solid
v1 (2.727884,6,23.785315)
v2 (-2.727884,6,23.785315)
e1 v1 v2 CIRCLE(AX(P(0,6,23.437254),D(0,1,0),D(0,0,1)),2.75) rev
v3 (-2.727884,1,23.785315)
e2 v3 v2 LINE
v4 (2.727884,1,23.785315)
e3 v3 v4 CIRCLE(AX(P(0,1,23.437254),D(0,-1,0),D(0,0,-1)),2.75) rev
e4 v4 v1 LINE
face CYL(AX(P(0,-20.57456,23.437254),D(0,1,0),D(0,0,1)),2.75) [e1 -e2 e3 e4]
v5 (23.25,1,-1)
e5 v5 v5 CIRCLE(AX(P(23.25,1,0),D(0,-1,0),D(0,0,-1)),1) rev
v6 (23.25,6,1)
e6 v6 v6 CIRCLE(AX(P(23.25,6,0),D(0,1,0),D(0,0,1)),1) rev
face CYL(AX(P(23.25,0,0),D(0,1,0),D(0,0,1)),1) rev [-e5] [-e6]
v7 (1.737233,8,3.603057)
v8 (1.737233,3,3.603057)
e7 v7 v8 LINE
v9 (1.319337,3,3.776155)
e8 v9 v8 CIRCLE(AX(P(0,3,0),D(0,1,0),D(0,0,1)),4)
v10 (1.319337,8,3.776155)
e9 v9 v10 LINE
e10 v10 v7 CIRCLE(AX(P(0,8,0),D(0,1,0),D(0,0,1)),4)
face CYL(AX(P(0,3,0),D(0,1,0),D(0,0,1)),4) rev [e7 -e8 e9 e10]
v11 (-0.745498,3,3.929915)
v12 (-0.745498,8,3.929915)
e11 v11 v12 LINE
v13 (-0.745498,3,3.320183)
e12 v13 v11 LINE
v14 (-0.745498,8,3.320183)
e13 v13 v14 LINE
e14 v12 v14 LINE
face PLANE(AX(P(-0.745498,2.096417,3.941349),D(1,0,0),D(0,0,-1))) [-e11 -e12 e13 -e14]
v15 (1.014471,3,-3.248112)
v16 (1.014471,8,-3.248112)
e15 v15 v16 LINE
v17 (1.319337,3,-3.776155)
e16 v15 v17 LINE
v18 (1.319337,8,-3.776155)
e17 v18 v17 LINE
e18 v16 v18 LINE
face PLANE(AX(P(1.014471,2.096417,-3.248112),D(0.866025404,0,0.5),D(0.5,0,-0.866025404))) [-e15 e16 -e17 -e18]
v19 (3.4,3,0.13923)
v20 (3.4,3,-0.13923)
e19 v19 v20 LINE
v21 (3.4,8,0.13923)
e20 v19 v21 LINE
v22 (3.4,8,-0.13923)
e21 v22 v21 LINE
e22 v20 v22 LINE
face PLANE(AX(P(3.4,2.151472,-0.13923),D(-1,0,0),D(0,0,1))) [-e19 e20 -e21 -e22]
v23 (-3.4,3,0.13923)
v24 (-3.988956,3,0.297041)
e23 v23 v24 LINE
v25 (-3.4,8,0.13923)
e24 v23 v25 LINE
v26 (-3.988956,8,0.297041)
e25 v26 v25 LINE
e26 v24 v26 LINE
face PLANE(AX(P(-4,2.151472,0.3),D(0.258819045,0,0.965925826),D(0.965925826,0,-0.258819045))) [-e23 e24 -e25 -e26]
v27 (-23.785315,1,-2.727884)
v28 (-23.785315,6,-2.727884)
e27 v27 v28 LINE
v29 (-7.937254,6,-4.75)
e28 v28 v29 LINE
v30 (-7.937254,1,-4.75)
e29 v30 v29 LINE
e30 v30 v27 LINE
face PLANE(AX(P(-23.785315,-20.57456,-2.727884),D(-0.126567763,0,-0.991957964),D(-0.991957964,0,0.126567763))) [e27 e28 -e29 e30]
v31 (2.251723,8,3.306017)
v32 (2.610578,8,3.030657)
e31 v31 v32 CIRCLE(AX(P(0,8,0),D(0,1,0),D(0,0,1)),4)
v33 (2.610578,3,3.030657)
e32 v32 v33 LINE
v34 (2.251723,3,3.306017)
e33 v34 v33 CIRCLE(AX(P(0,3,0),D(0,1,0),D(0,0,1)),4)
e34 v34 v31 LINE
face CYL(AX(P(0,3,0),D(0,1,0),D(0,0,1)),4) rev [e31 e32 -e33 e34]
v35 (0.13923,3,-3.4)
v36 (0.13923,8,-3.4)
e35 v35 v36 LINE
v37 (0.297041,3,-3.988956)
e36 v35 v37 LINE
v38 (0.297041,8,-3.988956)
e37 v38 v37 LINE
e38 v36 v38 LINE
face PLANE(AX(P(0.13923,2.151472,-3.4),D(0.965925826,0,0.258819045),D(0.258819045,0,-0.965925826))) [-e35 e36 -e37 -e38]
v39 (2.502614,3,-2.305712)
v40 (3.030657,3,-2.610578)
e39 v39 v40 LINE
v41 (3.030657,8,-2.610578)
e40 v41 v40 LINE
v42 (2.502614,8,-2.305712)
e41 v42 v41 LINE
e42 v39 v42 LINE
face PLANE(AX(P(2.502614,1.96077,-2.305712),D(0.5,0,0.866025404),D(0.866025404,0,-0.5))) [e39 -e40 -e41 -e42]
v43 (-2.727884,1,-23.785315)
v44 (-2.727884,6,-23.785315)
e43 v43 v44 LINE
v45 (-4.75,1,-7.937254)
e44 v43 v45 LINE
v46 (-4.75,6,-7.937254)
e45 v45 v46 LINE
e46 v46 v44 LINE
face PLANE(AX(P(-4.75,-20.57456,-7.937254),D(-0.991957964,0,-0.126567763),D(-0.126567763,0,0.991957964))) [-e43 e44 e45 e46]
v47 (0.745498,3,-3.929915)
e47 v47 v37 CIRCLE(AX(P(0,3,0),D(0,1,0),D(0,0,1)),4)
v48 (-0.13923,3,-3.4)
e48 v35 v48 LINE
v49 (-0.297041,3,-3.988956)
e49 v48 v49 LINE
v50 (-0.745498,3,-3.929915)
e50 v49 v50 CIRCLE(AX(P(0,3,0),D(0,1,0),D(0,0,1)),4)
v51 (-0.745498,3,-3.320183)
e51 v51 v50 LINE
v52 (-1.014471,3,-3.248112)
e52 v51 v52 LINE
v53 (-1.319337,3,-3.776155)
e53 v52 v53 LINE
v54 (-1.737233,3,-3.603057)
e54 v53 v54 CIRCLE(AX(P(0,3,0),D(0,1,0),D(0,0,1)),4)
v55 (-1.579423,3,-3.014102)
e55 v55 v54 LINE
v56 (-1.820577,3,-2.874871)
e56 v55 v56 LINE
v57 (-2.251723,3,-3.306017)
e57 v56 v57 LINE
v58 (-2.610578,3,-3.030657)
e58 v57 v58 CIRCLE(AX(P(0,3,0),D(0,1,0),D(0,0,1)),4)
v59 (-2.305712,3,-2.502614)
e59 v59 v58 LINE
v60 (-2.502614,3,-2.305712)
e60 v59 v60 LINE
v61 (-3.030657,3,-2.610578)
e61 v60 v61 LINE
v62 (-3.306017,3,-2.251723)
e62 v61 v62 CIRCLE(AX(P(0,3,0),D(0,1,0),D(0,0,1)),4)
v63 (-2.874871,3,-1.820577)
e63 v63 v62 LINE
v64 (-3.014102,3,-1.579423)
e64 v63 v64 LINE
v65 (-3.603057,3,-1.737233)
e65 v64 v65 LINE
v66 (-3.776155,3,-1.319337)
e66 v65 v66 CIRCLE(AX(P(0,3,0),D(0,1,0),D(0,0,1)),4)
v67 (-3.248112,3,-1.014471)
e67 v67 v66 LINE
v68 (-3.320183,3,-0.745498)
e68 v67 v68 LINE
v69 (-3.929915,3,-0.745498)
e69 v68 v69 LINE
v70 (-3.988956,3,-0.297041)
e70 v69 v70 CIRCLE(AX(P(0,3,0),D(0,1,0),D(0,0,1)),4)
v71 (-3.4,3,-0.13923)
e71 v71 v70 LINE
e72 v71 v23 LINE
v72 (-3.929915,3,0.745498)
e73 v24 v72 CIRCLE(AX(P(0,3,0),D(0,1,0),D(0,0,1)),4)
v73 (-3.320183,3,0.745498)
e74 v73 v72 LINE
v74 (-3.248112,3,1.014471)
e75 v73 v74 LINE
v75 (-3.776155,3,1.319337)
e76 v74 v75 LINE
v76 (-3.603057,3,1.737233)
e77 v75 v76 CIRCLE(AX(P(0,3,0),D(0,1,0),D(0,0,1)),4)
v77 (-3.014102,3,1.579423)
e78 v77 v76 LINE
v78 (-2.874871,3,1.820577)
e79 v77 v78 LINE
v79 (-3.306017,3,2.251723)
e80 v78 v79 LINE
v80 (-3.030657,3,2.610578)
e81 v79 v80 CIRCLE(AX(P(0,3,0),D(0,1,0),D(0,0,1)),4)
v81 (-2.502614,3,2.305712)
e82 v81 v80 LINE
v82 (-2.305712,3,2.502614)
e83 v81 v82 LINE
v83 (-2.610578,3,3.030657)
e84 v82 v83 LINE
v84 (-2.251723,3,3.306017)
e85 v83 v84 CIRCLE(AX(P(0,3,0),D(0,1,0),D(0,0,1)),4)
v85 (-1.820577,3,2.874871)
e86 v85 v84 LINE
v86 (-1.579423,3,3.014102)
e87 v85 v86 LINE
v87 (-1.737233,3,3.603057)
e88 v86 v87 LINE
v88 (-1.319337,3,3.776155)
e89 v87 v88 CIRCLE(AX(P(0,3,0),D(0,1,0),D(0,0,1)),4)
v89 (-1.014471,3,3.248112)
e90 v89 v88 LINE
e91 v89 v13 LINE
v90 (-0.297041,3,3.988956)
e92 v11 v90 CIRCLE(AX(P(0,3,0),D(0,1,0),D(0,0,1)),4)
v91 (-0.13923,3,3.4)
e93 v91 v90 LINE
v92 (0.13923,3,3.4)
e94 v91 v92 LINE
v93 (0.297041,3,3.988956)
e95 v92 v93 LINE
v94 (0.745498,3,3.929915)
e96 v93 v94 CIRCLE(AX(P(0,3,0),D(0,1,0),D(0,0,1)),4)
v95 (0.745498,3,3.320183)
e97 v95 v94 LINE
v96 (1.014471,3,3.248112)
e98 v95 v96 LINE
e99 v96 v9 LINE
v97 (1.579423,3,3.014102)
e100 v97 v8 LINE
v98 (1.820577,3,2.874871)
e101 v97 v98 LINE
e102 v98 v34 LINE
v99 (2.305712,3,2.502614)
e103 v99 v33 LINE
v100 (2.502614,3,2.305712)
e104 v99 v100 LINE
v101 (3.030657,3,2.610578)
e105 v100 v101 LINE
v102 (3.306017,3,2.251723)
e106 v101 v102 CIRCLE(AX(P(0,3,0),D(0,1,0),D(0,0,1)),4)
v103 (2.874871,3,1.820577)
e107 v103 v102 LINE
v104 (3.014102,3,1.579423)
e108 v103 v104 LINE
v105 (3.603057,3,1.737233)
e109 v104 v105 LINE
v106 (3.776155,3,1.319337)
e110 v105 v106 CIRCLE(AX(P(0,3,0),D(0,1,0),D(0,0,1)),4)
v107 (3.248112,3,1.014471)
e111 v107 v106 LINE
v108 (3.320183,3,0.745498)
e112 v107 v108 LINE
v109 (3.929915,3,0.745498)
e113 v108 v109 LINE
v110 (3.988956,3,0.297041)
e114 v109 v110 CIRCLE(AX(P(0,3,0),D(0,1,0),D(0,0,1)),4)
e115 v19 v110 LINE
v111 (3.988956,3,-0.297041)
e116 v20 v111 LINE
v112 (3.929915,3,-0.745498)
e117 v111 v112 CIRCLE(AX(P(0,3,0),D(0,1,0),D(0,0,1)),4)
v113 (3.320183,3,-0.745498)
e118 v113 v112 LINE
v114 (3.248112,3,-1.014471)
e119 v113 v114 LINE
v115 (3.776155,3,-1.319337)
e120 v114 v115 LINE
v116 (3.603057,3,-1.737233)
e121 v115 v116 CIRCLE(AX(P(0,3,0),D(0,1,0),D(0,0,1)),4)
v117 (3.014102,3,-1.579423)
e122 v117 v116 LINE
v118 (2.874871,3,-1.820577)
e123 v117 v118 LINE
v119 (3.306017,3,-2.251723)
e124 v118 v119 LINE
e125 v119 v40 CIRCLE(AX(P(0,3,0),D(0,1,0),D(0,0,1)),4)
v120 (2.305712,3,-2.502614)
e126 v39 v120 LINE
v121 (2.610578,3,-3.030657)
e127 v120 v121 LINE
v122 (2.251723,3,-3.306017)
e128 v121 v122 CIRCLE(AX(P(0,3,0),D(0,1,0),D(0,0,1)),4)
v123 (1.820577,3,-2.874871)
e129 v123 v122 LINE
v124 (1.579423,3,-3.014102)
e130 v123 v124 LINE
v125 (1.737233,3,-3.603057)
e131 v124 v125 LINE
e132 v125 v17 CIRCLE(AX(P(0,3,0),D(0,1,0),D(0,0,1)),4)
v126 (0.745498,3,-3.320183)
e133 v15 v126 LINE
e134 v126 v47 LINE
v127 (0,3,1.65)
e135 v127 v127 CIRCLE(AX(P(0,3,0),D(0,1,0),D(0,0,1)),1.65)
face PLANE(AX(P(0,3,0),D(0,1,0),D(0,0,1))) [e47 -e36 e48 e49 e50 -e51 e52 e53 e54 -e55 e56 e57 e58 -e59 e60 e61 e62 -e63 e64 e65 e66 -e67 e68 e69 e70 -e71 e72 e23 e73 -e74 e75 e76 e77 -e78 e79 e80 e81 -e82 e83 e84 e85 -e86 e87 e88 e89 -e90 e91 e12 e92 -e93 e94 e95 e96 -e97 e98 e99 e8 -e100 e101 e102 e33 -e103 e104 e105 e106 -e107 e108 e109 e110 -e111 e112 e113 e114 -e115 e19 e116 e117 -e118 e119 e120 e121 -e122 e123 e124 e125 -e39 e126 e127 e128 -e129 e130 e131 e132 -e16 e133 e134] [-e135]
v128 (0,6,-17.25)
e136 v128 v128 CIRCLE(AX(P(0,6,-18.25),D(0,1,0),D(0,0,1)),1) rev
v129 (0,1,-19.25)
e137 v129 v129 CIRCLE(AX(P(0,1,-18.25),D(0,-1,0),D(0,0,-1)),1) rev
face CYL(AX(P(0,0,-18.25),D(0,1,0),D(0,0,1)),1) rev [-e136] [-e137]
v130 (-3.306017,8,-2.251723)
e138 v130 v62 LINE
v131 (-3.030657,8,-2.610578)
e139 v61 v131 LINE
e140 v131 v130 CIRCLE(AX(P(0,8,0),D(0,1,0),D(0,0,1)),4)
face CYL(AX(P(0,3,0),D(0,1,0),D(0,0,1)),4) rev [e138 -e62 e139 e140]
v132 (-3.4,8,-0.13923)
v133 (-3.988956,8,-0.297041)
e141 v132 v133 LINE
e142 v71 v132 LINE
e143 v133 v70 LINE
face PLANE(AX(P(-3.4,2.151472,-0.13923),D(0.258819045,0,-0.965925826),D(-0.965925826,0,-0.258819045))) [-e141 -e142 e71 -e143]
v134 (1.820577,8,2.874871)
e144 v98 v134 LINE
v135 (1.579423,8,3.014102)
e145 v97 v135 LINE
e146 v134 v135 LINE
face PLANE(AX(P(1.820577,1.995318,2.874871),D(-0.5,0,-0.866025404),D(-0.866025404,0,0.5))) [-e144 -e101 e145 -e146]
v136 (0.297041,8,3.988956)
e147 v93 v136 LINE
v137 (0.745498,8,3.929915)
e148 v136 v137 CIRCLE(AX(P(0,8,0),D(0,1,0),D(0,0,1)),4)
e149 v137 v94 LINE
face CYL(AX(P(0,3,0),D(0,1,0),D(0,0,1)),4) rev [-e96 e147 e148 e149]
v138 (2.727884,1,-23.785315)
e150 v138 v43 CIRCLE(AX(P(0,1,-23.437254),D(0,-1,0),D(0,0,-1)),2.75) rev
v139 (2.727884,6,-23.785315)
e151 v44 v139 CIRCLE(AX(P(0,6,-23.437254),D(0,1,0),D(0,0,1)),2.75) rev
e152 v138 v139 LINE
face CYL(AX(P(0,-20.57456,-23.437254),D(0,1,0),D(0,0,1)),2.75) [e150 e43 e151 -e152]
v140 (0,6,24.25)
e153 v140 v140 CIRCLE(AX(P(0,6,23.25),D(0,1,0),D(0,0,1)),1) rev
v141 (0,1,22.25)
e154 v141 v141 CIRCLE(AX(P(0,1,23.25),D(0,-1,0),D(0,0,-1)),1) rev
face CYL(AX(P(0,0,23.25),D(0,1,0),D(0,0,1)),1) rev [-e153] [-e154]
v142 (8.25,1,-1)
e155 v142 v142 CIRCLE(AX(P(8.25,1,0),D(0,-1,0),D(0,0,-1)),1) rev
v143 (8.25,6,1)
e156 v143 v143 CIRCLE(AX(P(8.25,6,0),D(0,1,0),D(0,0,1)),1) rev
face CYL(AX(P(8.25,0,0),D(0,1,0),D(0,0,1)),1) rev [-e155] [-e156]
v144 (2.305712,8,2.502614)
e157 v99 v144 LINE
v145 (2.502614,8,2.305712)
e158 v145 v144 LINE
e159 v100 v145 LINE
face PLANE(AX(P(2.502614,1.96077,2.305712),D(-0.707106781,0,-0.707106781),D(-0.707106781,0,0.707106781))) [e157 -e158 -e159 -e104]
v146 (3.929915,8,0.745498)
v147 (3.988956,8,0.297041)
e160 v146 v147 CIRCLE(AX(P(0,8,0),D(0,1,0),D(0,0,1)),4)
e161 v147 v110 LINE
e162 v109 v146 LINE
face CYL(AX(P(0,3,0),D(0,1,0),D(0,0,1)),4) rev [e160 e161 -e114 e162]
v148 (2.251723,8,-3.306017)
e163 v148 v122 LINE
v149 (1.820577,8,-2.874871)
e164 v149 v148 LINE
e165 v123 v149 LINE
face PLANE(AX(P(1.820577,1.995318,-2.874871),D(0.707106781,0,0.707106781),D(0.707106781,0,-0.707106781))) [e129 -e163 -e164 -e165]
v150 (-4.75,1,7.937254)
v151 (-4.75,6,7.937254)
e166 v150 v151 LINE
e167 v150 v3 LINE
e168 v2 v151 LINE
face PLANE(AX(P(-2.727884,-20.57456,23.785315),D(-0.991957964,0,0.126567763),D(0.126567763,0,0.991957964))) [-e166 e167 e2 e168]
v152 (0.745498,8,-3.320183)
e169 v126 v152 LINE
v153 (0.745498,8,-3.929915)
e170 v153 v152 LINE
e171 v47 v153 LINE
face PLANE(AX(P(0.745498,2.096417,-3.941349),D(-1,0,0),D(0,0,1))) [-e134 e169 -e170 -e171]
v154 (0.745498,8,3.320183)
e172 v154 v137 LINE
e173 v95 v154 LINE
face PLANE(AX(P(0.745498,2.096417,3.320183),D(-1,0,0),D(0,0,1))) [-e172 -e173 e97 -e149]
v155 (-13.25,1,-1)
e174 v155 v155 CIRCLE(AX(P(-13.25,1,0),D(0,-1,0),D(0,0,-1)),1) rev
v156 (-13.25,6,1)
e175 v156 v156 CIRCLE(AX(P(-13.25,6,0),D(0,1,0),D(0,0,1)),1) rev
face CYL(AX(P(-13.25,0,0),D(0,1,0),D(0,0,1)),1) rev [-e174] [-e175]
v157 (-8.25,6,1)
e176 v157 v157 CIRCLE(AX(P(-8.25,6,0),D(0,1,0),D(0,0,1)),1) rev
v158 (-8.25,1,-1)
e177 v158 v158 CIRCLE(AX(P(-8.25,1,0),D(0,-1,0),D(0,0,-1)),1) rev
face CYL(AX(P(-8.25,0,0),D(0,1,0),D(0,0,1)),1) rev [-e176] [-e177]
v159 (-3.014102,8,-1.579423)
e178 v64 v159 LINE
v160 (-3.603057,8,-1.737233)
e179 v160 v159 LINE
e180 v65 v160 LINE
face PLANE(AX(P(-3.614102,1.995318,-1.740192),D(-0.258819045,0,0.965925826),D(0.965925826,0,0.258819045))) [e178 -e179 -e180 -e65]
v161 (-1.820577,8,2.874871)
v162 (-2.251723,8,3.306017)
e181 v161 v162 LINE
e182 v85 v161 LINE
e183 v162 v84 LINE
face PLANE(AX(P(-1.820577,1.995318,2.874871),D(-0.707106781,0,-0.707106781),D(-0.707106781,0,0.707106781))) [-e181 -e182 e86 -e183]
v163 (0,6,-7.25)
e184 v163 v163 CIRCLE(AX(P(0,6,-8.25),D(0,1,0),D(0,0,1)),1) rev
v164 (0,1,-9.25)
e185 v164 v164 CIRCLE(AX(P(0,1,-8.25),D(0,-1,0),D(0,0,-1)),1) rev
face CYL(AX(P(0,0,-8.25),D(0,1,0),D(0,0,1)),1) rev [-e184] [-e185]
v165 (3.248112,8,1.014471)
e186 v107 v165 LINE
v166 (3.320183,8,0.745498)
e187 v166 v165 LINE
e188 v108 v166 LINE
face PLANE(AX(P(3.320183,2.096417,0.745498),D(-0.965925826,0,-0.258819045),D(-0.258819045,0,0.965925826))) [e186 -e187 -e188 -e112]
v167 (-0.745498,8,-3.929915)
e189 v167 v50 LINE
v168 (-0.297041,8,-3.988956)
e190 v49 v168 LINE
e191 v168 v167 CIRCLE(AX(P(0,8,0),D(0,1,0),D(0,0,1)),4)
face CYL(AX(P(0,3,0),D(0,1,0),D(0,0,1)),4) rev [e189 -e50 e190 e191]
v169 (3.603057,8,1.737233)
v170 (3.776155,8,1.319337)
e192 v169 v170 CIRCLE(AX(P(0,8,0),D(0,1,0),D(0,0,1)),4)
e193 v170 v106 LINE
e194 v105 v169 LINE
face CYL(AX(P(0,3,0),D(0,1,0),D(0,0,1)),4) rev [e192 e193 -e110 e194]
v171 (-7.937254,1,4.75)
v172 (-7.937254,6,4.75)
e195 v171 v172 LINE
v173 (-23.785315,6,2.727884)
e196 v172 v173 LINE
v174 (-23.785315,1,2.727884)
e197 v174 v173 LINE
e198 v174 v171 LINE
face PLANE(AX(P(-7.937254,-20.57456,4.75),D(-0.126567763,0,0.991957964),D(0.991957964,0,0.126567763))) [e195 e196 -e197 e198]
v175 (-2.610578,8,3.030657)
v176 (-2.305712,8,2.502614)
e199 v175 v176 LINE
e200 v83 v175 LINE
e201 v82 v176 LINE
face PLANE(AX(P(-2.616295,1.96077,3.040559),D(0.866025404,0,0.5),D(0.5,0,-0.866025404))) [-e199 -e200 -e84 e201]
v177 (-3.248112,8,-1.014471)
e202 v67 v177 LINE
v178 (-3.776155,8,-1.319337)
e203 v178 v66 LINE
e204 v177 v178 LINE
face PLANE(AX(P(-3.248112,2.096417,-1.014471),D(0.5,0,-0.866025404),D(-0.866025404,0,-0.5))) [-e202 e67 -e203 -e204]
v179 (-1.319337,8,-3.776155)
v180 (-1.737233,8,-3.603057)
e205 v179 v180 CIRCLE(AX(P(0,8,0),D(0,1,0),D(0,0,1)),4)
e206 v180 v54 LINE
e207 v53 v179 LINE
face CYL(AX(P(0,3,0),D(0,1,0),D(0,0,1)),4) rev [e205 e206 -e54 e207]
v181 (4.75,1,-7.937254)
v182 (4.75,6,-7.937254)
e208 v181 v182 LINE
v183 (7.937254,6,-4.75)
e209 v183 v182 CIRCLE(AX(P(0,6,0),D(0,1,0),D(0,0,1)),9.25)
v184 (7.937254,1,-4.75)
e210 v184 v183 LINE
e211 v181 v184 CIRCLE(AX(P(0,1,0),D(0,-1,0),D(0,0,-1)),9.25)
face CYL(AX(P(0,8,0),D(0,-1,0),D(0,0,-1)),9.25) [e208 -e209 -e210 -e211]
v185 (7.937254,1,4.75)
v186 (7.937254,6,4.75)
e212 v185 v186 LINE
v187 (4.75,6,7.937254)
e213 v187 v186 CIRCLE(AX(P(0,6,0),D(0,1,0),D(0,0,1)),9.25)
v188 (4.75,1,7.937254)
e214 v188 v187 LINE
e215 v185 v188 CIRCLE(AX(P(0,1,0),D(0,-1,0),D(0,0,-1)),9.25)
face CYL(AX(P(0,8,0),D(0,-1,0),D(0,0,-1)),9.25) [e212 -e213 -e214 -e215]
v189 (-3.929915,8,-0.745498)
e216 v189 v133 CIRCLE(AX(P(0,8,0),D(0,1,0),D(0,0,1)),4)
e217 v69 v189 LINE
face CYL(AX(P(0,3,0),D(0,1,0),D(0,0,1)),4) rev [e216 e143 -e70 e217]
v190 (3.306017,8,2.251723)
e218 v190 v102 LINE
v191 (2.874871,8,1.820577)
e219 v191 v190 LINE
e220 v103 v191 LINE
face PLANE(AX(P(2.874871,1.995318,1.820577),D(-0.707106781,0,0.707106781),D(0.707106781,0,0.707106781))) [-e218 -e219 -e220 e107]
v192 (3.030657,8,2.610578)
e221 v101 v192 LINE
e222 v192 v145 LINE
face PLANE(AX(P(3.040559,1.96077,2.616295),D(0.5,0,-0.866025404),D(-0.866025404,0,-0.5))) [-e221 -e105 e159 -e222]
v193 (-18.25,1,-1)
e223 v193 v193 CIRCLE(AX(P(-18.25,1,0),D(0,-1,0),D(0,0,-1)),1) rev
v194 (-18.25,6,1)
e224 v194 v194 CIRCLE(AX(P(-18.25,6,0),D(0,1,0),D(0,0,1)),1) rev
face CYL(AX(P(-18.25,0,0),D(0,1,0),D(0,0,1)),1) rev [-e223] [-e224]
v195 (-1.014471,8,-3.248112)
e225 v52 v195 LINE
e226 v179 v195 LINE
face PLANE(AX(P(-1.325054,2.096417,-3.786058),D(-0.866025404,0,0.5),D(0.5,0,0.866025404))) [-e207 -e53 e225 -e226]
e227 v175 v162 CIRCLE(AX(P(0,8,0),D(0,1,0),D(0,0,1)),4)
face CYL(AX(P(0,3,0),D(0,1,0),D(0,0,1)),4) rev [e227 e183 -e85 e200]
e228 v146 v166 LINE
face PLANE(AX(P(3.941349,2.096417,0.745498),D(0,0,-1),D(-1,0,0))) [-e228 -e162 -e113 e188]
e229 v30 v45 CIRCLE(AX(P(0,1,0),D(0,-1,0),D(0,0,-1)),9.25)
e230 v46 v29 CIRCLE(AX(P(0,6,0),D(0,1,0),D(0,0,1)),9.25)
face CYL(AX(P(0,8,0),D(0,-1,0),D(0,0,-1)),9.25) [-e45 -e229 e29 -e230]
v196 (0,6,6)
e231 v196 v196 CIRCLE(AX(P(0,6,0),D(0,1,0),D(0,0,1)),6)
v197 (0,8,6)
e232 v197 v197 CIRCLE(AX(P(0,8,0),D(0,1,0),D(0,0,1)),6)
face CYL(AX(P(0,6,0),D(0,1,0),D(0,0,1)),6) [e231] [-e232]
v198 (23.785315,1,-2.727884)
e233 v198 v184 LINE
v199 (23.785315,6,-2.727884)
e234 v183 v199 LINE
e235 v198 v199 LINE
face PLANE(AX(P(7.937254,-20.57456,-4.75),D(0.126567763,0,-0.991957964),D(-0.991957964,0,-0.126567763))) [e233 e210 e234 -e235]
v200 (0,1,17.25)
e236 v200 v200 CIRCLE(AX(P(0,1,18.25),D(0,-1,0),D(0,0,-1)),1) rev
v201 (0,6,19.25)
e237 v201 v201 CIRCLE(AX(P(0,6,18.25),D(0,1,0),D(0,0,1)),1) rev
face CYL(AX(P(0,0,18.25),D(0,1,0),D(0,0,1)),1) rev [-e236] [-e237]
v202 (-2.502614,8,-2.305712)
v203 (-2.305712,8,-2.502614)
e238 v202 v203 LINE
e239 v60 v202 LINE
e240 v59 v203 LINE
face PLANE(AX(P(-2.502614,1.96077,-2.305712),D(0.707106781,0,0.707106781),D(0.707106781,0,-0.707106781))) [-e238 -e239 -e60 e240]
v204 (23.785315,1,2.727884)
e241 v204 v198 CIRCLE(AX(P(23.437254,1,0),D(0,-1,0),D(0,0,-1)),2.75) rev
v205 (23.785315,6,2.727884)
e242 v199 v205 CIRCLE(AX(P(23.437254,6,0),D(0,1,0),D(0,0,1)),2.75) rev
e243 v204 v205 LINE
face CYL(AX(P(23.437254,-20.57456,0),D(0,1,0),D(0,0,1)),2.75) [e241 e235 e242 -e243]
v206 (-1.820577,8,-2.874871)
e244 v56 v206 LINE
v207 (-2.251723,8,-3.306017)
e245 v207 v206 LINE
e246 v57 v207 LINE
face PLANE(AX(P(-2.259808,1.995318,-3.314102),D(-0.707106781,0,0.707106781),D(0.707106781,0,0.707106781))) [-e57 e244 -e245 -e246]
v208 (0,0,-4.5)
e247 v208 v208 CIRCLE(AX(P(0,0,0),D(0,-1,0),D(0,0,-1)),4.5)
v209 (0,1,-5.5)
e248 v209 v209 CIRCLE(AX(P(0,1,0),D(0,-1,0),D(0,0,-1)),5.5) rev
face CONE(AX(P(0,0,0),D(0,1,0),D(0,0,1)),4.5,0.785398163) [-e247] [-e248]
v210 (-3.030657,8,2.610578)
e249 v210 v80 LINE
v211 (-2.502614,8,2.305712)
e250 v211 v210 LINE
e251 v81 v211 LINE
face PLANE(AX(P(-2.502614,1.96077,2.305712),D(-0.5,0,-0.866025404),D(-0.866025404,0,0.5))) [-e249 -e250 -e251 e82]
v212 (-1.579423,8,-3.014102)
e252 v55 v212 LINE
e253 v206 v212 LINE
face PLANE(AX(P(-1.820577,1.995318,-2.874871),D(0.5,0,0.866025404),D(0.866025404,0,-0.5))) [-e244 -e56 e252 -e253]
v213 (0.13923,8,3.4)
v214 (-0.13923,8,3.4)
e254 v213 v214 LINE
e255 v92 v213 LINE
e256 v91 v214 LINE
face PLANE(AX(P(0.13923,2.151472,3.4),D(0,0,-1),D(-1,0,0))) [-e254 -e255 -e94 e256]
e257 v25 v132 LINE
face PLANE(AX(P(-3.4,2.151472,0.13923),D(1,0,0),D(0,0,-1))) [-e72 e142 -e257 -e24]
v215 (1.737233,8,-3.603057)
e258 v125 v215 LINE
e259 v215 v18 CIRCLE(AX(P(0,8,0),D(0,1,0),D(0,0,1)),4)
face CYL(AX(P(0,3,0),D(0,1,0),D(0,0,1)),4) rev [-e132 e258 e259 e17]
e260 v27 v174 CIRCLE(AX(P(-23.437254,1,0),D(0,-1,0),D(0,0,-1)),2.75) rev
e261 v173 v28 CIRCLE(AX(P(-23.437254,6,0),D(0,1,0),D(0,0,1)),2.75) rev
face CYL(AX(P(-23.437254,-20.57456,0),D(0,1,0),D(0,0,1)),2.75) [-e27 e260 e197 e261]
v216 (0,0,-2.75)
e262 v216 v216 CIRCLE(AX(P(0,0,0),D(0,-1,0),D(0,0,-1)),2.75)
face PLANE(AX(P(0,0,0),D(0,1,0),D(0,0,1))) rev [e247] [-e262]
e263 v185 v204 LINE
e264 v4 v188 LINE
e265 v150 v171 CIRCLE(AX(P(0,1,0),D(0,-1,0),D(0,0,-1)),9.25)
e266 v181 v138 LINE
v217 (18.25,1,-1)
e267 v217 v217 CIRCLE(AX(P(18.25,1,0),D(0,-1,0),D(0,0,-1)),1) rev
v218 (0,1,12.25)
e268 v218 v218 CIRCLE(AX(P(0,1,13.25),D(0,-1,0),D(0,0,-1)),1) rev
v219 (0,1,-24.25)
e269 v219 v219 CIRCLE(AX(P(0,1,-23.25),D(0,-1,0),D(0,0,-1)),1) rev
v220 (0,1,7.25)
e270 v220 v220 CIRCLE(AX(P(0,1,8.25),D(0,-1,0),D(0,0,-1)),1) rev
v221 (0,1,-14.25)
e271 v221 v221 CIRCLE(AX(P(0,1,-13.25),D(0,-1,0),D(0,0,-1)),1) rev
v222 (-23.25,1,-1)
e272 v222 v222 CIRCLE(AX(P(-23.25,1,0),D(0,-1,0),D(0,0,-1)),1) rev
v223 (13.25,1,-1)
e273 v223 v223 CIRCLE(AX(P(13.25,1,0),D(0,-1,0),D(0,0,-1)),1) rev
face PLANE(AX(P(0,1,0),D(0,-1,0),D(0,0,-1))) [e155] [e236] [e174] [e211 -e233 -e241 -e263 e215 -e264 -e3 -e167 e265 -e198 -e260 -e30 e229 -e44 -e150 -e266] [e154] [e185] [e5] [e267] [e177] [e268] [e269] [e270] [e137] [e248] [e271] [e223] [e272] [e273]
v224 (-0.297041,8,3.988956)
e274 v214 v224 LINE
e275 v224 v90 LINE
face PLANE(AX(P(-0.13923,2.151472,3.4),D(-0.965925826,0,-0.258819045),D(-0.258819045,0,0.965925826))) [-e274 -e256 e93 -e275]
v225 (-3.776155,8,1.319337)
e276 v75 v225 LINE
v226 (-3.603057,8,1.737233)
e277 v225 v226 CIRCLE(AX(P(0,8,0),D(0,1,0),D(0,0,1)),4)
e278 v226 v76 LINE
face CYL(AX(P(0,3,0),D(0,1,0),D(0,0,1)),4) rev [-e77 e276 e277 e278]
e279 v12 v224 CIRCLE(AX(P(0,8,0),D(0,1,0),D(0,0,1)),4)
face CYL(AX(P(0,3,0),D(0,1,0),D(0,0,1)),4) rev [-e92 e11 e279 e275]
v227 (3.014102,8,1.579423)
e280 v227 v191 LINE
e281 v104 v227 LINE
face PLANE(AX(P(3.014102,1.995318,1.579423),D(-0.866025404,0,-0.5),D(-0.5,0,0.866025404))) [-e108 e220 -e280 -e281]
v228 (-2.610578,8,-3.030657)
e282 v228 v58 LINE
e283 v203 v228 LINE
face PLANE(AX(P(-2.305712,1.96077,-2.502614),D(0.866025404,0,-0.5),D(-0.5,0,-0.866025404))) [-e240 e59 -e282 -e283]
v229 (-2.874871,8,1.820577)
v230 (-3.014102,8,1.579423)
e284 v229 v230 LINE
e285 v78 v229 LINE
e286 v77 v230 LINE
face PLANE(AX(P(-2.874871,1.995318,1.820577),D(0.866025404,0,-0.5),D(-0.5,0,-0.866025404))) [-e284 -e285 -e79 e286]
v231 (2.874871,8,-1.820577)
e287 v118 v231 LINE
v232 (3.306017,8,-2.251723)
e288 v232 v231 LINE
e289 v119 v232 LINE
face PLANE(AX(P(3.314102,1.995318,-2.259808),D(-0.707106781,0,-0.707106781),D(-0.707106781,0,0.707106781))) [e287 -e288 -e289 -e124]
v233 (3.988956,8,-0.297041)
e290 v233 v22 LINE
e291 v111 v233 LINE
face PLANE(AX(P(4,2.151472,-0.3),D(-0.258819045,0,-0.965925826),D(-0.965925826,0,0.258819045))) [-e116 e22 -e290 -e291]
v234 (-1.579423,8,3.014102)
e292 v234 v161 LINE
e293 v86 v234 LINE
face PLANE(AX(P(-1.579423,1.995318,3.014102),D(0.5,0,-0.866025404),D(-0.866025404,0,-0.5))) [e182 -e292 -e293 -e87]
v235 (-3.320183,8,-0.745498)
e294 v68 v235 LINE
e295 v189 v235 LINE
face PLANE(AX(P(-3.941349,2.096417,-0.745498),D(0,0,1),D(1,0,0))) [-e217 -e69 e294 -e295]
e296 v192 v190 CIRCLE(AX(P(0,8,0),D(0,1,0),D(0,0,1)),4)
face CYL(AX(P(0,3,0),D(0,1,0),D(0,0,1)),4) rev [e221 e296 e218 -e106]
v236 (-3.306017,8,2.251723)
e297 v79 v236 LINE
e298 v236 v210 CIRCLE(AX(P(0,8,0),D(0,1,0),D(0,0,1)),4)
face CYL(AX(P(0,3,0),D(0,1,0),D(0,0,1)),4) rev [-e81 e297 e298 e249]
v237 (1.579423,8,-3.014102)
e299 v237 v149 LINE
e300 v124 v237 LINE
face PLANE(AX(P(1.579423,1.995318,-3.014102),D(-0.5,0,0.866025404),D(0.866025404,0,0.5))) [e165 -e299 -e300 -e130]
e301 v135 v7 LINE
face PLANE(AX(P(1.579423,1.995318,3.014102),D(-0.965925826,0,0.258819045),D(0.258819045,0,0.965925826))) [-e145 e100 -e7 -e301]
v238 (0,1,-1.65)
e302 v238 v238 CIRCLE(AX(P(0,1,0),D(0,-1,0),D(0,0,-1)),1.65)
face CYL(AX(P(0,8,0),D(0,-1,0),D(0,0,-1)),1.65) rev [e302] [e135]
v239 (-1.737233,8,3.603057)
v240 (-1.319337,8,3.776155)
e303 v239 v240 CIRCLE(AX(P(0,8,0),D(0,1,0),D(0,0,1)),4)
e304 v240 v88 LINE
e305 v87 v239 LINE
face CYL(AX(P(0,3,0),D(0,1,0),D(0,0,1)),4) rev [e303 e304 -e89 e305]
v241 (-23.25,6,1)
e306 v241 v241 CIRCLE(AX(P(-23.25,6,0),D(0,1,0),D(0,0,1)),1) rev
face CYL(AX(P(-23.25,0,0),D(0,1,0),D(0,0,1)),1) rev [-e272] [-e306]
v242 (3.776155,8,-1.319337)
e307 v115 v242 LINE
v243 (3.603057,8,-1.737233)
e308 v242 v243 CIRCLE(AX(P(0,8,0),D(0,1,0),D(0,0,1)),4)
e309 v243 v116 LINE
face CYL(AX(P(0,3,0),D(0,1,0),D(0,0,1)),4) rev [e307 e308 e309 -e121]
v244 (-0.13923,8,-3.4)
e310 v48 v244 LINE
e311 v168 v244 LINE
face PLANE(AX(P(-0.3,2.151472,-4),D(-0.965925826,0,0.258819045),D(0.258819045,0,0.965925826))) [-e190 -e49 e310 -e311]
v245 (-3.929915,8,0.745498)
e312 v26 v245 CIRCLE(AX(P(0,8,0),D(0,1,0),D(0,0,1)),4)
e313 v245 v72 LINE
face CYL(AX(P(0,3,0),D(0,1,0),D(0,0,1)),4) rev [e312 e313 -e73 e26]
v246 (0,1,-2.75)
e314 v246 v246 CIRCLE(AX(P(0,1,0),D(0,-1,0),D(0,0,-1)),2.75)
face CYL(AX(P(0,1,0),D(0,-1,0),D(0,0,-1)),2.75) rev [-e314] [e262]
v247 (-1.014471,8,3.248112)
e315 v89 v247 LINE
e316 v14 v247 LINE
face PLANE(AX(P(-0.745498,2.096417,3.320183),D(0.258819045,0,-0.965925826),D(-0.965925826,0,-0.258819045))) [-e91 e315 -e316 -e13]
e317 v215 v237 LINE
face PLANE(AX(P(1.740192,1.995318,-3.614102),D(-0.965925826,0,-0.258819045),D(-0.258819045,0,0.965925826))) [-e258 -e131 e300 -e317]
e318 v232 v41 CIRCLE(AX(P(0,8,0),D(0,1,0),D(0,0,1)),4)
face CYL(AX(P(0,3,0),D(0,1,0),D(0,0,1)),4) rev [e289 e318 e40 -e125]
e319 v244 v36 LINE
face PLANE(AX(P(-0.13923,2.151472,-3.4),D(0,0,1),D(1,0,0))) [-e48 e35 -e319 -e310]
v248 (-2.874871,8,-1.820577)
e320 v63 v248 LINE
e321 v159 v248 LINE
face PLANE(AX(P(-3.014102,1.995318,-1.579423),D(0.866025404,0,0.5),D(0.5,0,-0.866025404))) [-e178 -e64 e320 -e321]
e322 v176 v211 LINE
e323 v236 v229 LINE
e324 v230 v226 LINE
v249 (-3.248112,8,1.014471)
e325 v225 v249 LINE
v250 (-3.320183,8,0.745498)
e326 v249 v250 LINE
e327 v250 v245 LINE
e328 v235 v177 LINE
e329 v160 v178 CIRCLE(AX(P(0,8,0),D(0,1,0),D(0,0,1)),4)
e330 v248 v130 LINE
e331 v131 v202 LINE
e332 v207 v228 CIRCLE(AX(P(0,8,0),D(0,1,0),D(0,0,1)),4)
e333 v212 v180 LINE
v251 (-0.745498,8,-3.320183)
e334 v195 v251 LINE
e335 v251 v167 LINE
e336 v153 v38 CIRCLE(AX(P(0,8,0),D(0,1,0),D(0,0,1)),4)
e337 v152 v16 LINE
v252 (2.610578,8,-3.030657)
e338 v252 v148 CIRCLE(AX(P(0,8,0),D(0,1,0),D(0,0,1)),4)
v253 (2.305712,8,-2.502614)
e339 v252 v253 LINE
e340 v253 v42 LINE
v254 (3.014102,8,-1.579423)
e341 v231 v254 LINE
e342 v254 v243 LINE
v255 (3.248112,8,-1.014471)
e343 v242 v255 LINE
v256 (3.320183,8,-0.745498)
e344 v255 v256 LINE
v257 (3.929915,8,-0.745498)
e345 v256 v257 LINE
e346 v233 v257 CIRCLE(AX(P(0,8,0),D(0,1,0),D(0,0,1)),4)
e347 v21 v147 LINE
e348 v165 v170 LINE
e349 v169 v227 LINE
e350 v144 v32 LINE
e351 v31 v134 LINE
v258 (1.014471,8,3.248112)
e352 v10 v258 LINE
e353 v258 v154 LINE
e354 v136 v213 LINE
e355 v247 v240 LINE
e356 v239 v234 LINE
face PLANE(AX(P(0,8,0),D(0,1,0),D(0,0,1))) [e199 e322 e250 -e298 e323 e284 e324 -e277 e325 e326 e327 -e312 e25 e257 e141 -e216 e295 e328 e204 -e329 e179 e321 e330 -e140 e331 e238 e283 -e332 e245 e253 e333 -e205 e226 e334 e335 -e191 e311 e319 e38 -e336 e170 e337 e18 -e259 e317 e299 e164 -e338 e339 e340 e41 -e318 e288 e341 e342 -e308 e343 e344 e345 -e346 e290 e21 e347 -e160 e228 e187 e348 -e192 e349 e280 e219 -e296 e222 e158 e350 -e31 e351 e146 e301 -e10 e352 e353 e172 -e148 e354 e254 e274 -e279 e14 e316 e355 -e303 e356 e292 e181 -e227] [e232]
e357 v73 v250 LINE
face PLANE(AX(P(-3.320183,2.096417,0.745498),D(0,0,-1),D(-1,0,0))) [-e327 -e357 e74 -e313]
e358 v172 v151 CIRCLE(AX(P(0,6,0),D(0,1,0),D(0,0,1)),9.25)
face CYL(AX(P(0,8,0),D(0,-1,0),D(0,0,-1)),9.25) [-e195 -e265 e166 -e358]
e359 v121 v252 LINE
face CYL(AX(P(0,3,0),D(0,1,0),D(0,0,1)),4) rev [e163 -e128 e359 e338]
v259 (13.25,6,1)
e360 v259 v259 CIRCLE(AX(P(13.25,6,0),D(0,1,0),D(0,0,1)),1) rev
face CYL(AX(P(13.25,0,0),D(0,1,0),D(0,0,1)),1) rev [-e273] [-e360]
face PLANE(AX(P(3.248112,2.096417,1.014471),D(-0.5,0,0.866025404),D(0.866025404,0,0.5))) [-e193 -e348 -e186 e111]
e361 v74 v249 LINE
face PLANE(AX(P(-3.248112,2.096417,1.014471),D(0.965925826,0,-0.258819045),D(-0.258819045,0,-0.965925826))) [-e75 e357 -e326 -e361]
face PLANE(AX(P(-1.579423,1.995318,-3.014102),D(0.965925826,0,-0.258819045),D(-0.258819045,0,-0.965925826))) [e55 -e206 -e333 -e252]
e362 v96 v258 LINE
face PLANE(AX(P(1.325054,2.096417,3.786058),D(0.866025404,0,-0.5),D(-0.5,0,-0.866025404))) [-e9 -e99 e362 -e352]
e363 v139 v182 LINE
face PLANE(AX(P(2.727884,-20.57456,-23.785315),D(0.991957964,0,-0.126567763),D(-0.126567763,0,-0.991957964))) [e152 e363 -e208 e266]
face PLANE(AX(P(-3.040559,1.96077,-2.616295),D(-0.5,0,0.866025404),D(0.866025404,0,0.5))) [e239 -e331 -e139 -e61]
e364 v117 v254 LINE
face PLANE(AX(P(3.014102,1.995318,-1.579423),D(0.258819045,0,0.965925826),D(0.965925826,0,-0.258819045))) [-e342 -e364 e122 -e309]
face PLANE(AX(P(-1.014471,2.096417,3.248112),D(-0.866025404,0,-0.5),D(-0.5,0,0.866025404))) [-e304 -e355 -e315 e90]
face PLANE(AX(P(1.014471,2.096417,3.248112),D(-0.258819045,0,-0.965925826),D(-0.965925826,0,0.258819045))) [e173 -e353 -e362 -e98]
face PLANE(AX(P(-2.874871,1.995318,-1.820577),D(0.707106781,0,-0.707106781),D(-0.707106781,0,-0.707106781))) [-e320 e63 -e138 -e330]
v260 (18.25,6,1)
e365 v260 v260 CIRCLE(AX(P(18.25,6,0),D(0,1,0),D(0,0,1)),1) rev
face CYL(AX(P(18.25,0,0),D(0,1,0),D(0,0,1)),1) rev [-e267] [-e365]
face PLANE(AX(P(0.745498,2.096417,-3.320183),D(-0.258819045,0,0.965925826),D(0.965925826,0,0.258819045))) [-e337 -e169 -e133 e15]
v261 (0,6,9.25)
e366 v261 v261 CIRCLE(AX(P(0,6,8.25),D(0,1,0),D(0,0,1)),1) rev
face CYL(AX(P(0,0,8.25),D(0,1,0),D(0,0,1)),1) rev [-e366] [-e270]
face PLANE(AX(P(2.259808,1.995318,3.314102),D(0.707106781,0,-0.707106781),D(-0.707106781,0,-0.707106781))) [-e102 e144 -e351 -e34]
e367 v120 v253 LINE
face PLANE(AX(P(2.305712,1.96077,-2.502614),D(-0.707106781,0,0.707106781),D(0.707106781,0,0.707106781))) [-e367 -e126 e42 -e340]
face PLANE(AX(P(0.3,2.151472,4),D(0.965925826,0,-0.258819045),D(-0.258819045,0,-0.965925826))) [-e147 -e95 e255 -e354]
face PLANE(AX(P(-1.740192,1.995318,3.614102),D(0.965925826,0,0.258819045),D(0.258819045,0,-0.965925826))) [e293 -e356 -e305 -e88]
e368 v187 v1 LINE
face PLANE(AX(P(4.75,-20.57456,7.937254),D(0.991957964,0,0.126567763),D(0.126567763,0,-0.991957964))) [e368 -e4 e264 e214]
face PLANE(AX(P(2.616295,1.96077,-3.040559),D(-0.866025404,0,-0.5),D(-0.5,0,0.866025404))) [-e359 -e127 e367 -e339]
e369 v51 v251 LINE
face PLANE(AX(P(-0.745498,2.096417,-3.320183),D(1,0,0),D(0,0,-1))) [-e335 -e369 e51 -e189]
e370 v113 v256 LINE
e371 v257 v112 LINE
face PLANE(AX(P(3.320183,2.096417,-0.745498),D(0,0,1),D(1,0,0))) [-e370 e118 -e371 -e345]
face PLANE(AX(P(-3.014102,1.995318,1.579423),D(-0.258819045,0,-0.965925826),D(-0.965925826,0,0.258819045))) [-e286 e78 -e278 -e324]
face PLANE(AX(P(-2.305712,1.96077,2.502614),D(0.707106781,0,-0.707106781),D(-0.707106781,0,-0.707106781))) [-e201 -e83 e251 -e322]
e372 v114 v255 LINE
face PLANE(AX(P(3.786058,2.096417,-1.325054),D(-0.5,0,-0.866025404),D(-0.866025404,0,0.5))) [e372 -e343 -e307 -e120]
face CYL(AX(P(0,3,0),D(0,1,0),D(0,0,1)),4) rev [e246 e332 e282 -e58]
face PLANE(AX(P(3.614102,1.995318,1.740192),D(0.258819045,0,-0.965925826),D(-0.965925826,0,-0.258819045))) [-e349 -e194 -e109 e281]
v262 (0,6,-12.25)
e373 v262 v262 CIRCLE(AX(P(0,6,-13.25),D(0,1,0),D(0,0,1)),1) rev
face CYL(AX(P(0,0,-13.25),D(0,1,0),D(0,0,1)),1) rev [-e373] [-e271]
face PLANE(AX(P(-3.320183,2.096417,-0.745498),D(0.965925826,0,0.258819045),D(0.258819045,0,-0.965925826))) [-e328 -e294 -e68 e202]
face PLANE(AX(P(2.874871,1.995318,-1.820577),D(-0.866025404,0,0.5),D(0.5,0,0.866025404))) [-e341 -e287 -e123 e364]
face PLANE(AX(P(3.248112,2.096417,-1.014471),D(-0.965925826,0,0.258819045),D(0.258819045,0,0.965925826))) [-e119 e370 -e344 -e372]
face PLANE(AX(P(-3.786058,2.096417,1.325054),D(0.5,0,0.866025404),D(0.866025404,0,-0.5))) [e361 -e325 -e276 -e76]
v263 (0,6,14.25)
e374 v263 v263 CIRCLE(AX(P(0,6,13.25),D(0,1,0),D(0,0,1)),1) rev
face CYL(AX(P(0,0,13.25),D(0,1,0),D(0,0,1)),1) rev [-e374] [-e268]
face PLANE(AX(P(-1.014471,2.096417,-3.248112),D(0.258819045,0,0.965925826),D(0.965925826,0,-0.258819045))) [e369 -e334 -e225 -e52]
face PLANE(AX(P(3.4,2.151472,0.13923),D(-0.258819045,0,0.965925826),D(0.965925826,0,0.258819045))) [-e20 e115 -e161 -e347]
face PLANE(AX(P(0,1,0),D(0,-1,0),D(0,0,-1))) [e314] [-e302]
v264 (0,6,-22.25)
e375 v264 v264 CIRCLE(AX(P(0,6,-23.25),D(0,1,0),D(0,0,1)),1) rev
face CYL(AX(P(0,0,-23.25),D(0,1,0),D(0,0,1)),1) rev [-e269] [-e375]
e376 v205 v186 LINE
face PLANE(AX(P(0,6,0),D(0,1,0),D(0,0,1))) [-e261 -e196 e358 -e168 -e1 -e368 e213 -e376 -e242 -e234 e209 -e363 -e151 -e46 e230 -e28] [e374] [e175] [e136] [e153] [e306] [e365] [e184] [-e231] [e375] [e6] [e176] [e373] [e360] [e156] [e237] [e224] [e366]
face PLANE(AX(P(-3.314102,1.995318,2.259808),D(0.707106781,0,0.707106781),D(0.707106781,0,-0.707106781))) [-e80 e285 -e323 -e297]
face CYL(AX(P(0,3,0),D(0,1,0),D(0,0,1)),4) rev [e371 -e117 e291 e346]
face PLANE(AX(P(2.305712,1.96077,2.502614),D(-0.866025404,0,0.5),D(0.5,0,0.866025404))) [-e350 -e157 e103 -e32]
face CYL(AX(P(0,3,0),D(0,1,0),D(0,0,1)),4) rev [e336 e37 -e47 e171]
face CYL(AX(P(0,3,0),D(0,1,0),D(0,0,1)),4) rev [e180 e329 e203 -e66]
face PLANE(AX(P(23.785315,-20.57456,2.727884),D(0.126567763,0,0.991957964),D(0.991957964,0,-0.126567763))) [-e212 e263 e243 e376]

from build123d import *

# Parameters (mm, degrees)
ESQUISSE1_R                            = 9.25
ESQUISSE1_R_2                          = 1.65
BOSS_EXTRU_1_DEPTH                     = 8
BOSS_EXTRU_2_DEPTH                     = 8
R_P_TITION_CIRCULAIRE1_COUNT           = 4
ESQUISSE3_R                            = 1
ENL_V_MAT_EXTRU_1_DEPTH                = 8
R_P_TITION_LIN_AIRE1_COUNT             = 4
R_P_TITION_LIN_AIRE1_PITCH             = 5
R_P_TITION_CIRCULAIRE2_COUNT           = 4
R_P_TITION_CIRCULAIRE2_COPY_1_SKETCH_R = 1
R_P_TITION_CIRCULAIRE2_COPY_1_DEPTH    = 8
R_P_TITION_CIRCULAIRE2_COPY_2_SKETCH_R = 1
R_P_TITION_CIRCULAIRE2_COPY_2_DEPTH    = 8
R_P_TITION_CIRCULAIRE2_COPY_3_SKETCH_R = 1
R_P_TITION_CIRCULAIRE2_COPY_3_DEPTH    = 8
R_P_TITION_CIRCULAIRE2_COPY_4_SKETCH_R = 1
R_P_TITION_CIRCULAIRE2_COPY_4_DEPTH    = 8
R_P_TITION_CIRCULAIRE2_COPY_5_SKETCH_R = 1
R_P_TITION_CIRCULAIRE2_COPY_5_DEPTH    = 8
R_P_TITION_CIRCULAIRE2_COPY_6_SKETCH_R = 1
R_P_TITION_CIRCULAIRE2_COPY_6_DEPTH    = 8
R_P_TITION_CIRCULAIRE2_COPY_7_SKETCH_R = 1
R_P_TITION_CIRCULAIRE2_COPY_7_DEPTH    = 8
R_P_TITION_CIRCULAIRE2_COPY_8_SKETCH_R = 1
R_P_TITION_CIRCULAIRE2_COPY_8_DEPTH    = 8
R_P_TITION_CIRCULAIRE2_COPY_9_SKETCH_R = 1
R_P_TITION_CIRCULAIRE2_COPY_9_DEPTH    = 8
ESQUISSE4_W                            = 74.025208854
ESQUISSE4_H                            = 65.087506081
ESQUISSE4_R                            = 6
ENL_V_MAT_EXTRU_2_DEPTH                = 2
ESQUISSE5_R                            = 4
ENL_V_MAT_EXTRU_3_DEPTH                = 5
BOSS_EXTRU_3_DEPTH                     = 5
R_P_TITION_CIRCULAIRE3_COUNT           = 24
ESQUISSE7_R                            = 34.023023218
ESQUISSE7_R_2                          = 4.5
ENL_V_MAT_EXTRU_4_DEPTH                = 1
ESQUISSE8_R                            = 2.75
ENL_V_MAT_EXTRU_5_DEPTH                = 1
CHANFREIN1_SIZE                        = 1


with BuildPart() as part:
    # Esquisse1 → Boss.-Extru.1 (new body)
    with BuildSketch(Plane(origin=(0, 0, 0), x_dir=(1, 0, 0), z_dir=(0, 1, 0))):
        with Locations(Location((0, 0, 0), (0, 0, 270))):
            Circle(ESQUISSE1_R)
        with Locations(Location((0, 0, 0), (0, 0, 270))):
            Circle(ESQUISSE1_R_2, mode=Mode.SUBTRACT)
    extrude(amount=BOSS_EXTRU_1_DEPTH)

    # Esquisse2 → Boss.-Extru.2 (add)
    with BuildSketch(Plane(origin=(0, 8, 0), x_dir=(1, 0, 0), z_dir=(0, 1, 0))):
        with BuildLine():
            Line((-4.75, 7.937253933), (-2.7278844, 23.785315281))
            ThreePointArc((-2.7278844, 23.785315281), (0, 26.187253933), (2.7278844, 23.785315281))
            Line((2.7278844, 23.785315281), (4.75, 7.937253933))
            Line((4.75, 7.937253933), (-4.75, 7.937253933))
        make_face()
    boss_extru_2 = extrude(amount=-BOSS_EXTRU_2_DEPTH)

    # Répétition circulaire1: Boss.-Extru.2 ×4 about axis
    r_p_tition_circulaire1_axis = Axis((0, 0, 0), (0, 1, 0))
    for i in range(1, R_P_TITION_CIRCULAIRE1_COUNT):
        add(boss_extru_2.rotate(r_p_tition_circulaire1_axis, i * 360 / R_P_TITION_CIRCULAIRE1_COUNT))

    # Esquisse3 → Enlèv. mat.-Extru.1 (cut)
    with BuildSketch(Plane(origin=(0, 8, 0), x_dir=(1, 0, 0), z_dir=(0, 1, 0))):
        with Locations(Location((0, 8.25, 0), (0, 0, 270))):
            Circle(ESQUISSE3_R)
    enl_v_mat_extru_1 = extrude(amount=-ENL_V_MAT_EXTRU_1_DEPTH, mode=Mode.SUBTRACT)

    # Répétition linéaire1: Enlèv. mat.-Extru.1 ×4
    with Locations(*[(0, 0, -i * R_P_TITION_LIN_AIRE1_PITCH) for i in range(1, R_P_TITION_LIN_AIRE1_COUNT)]):
        add(enl_v_mat_extru_1, mode=Mode.SUBTRACT)

    # Répétition circulaire2: Enlèv. mat.-Extru.1 ×4 about axis
    r_p_tition_circulaire2_axis = Axis((0, 0, 0), (0, 1, 0))
    for i in range(1, R_P_TITION_CIRCULAIRE2_COUNT):
        add(enl_v_mat_extru_1.rotate(r_p_tition_circulaire2_axis, i * 360 / R_P_TITION_CIRCULAIRE2_COUNT), mode=Mode.SUBTRACT)

    # Répétition circulaire2 copy 1 sketch → Répétition circulaire2 copy 1 (cut)
    with BuildSketch(Plane(origin=(-5, 8, 0), x_dir=(0, 0, -1), z_dir=(0, 1, 0))):
        with Locations(Location((0, 8.25, 0), (0, 0, 270))):
            Circle(R_P_TITION_CIRCULAIRE2_COPY_1_SKETCH_R)
    extrude(amount=-R_P_TITION_CIRCULAIRE2_COPY_1_DEPTH, mode=Mode.SUBTRACT)

    # Répétition circulaire2 copy 2 sketch → Répétition circulaire2 copy 2 (cut)
    with BuildSketch(Plane(origin=(0, 8, 5), x_dir=(-1, 0, 0), z_dir=(0, 1, 0))):
        with Locations(Location((0, 8.25, 0), (0, 0, 270))):
            Circle(R_P_TITION_CIRCULAIRE2_COPY_2_SKETCH_R)
    extrude(amount=-R_P_TITION_CIRCULAIRE2_COPY_2_DEPTH, mode=Mode.SUBTRACT)

    # Répétition circulaire2 copy 3 sketch → Répétition circulaire2 copy 3 (cut)
    with BuildSketch(Plane(origin=(5, 8, 0), x_dir=(0, 0, 1), z_dir=(0, 1, 0))):
        with Locations(Location((0, 8.25, 0), (0, 0, 270))):
            Circle(R_P_TITION_CIRCULAIRE2_COPY_3_SKETCH_R)
    extrude(amount=-R_P_TITION_CIRCULAIRE2_COPY_3_DEPTH, mode=Mode.SUBTRACT)

    # Répétition circulaire2 copy 4 sketch → Répétition circulaire2 copy 4 (cut)
    with BuildSketch(Plane(origin=(-10, 8, 0), x_dir=(0, 0, -1), z_dir=(0, 1, 0))):
        with Locations(Location((0, 8.25, 0), (0, 0, 270))):
            Circle(R_P_TITION_CIRCULAIRE2_COPY_4_SKETCH_R)
    extrude(amount=-R_P_TITION_CIRCULAIRE2_COPY_4_DEPTH, mode=Mode.SUBTRACT)

    # Répétition circulaire2 copy 5 sketch → Répétition circulaire2 copy 5 (cut)
    with BuildSketch(Plane(origin=(0, 8, 10), x_dir=(-1, 0, 0), z_dir=(0, 1, 0))):
        with Locations(Location((0, 8.25, 0), (0, 0, 270))):
            Circle(R_P_TITION_CIRCULAIRE2_COPY_5_SKETCH_R)
    extrude(amount=-R_P_TITION_CIRCULAIRE2_COPY_5_DEPTH, mode=Mode.SUBTRACT)

    # Répétition circulaire2 copy 6 sketch → Répétition circulaire2 copy 6 (cut)
    with BuildSketch(Plane(origin=(10, 8, 0), x_dir=(0, 0, 1), z_dir=(0, 1, 0))):
        with Locations(Location((0, 8.25, 0), (0, 0, 270))):
            Circle(R_P_TITION_CIRCULAIRE2_COPY_6_SKETCH_R)
    extrude(amount=-R_P_TITION_CIRCULAIRE2_COPY_6_DEPTH, mode=Mode.SUBTRACT)

    # Répétition circulaire2 copy 7 sketch → Répétition circulaire2 copy 7 (cut)
    with BuildSketch(Plane(origin=(-15, 8, 0), x_dir=(0, 0, -1), z_dir=(0, 1, 0))):
        with Locations(Location((0, 8.25, 0), (0, 0, 270))):
            Circle(R_P_TITION_CIRCULAIRE2_COPY_7_SKETCH_R)
    extrude(amount=-R_P_TITION_CIRCULAIRE2_COPY_7_DEPTH, mode=Mode.SUBTRACT)

    # Répétition circulaire2 copy 8 sketch → Répétition circulaire2 copy 8 (cut)
    with BuildSketch(Plane(origin=(0, 8, 15), x_dir=(-1, 0, 0), z_dir=(0, 1, 0))):
        with Locations(Location((0, 8.25, 0), (0, 0, 270))):
            Circle(R_P_TITION_CIRCULAIRE2_COPY_8_SKETCH_R)
    extrude(amount=-R_P_TITION_CIRCULAIRE2_COPY_8_DEPTH, mode=Mode.SUBTRACT)

    # Répétition circulaire2 copy 9 sketch → Répétition circulaire2 copy 9 (cut)
    with BuildSketch(Plane(origin=(15, 8, 0), x_dir=(0, 0, 1), z_dir=(0, 1, 0))):
        with Locations(Location((0, 8.25, 0), (0, 0, 270))):
            Circle(R_P_TITION_CIRCULAIRE2_COPY_9_SKETCH_R)
    extrude(amount=-R_P_TITION_CIRCULAIRE2_COPY_9_DEPTH, mode=Mode.SUBTRACT)

    # Esquisse4 → Enlèv. mat.-Extru.2 (cut)
    with BuildSketch(Plane(origin=(0, 8, 0), x_dir=(1, 0, 0), z_dir=(0, 1, 0))):
        with Locations((-0.052574722, -0.420597777)):
            Rectangle(ESQUISSE4_W, ESQUISSE4_H)
        with Locations(Location((0, 0, 0), (0, 0, 270))):
            Circle(ESQUISSE4_R, mode=Mode.SUBTRACT)
    extrude(amount=-ENL_V_MAT_EXTRU_2_DEPTH, mode=Mode.SUBTRACT)

    # Esquisse5 → Enlèv. mat.-Extru.3 (cut)
    with BuildSketch(Plane(origin=(0, 8, 0), x_dir=(1, 0, 0), z_dir=(0, 1, 0))):
        with Locations(Location((0, 0, 0), (0, 0, 270))):
            Circle(ESQUISSE5_R)
    extrude(amount=-ENL_V_MAT_EXTRU_3_DEPTH, mode=Mode.SUBTRACT)

    # Esquisse6 → Boss.-Extru.3 (add)
    with BuildSketch(Plane(origin=(0, 8, 0), x_dir=(1, 0, 0), z_dir=(0, 1, 0))):
        Polygon((-0.3, 4), (-0.139230485, 3.4), (0.139230485, 3.4), (0.3, 4), align=None)
    boss_extru_3 = extrude(amount=-BOSS_EXTRU_3_DEPTH)

    # Répétition circulaire3: Boss.-Extru.3 ×24 about axis
    r_p_tition_circulaire3_axis = Axis((0, 0, 0), (0, 1, 0))
    for i in range(1, R_P_TITION_CIRCULAIRE3_COUNT):
        add(boss_extru_3.rotate(r_p_tition_circulaire3_axis, i * 360 / R_P_TITION_CIRCULAIRE3_COUNT))

    # Esquisse7 → Enlèv. mat.-Extru.4 (cut)
    with BuildSketch(Plane.XZ):
        Circle(ESQUISSE7_R)
        with Locations(Location((0, 0, 0), (0, 0, 270))):
            Circle(ESQUISSE7_R_2, mode=Mode.SUBTRACT)
    extrude(amount=-ENL_V_MAT_EXTRU_4_DEPTH, mode=Mode.SUBTRACT)

    # Esquisse8 → Enlèv. mat.-Extru.5 (cut)
    with BuildSketch(Plane.XZ):
        with Locations(Location((0, 0, 0), (0, 0, 270))):
            Circle(ESQUISSE8_R)
    extrude(amount=-ENL_V_MAT_EXTRU_5_DEPTH, mode=Mode.SUBTRACT)

    # Chanfrein1
    chanfrein1_edges = [part.edges().sort_by_distance(p)[0] for p in [
        (0, 1, 4.5),
    ]]
    chamfer(chanfrein1_edges, length=CHANFREIN1_SIZE - 0.0001)  # a hair under: the kernel refuses the full size


solid = part.part
